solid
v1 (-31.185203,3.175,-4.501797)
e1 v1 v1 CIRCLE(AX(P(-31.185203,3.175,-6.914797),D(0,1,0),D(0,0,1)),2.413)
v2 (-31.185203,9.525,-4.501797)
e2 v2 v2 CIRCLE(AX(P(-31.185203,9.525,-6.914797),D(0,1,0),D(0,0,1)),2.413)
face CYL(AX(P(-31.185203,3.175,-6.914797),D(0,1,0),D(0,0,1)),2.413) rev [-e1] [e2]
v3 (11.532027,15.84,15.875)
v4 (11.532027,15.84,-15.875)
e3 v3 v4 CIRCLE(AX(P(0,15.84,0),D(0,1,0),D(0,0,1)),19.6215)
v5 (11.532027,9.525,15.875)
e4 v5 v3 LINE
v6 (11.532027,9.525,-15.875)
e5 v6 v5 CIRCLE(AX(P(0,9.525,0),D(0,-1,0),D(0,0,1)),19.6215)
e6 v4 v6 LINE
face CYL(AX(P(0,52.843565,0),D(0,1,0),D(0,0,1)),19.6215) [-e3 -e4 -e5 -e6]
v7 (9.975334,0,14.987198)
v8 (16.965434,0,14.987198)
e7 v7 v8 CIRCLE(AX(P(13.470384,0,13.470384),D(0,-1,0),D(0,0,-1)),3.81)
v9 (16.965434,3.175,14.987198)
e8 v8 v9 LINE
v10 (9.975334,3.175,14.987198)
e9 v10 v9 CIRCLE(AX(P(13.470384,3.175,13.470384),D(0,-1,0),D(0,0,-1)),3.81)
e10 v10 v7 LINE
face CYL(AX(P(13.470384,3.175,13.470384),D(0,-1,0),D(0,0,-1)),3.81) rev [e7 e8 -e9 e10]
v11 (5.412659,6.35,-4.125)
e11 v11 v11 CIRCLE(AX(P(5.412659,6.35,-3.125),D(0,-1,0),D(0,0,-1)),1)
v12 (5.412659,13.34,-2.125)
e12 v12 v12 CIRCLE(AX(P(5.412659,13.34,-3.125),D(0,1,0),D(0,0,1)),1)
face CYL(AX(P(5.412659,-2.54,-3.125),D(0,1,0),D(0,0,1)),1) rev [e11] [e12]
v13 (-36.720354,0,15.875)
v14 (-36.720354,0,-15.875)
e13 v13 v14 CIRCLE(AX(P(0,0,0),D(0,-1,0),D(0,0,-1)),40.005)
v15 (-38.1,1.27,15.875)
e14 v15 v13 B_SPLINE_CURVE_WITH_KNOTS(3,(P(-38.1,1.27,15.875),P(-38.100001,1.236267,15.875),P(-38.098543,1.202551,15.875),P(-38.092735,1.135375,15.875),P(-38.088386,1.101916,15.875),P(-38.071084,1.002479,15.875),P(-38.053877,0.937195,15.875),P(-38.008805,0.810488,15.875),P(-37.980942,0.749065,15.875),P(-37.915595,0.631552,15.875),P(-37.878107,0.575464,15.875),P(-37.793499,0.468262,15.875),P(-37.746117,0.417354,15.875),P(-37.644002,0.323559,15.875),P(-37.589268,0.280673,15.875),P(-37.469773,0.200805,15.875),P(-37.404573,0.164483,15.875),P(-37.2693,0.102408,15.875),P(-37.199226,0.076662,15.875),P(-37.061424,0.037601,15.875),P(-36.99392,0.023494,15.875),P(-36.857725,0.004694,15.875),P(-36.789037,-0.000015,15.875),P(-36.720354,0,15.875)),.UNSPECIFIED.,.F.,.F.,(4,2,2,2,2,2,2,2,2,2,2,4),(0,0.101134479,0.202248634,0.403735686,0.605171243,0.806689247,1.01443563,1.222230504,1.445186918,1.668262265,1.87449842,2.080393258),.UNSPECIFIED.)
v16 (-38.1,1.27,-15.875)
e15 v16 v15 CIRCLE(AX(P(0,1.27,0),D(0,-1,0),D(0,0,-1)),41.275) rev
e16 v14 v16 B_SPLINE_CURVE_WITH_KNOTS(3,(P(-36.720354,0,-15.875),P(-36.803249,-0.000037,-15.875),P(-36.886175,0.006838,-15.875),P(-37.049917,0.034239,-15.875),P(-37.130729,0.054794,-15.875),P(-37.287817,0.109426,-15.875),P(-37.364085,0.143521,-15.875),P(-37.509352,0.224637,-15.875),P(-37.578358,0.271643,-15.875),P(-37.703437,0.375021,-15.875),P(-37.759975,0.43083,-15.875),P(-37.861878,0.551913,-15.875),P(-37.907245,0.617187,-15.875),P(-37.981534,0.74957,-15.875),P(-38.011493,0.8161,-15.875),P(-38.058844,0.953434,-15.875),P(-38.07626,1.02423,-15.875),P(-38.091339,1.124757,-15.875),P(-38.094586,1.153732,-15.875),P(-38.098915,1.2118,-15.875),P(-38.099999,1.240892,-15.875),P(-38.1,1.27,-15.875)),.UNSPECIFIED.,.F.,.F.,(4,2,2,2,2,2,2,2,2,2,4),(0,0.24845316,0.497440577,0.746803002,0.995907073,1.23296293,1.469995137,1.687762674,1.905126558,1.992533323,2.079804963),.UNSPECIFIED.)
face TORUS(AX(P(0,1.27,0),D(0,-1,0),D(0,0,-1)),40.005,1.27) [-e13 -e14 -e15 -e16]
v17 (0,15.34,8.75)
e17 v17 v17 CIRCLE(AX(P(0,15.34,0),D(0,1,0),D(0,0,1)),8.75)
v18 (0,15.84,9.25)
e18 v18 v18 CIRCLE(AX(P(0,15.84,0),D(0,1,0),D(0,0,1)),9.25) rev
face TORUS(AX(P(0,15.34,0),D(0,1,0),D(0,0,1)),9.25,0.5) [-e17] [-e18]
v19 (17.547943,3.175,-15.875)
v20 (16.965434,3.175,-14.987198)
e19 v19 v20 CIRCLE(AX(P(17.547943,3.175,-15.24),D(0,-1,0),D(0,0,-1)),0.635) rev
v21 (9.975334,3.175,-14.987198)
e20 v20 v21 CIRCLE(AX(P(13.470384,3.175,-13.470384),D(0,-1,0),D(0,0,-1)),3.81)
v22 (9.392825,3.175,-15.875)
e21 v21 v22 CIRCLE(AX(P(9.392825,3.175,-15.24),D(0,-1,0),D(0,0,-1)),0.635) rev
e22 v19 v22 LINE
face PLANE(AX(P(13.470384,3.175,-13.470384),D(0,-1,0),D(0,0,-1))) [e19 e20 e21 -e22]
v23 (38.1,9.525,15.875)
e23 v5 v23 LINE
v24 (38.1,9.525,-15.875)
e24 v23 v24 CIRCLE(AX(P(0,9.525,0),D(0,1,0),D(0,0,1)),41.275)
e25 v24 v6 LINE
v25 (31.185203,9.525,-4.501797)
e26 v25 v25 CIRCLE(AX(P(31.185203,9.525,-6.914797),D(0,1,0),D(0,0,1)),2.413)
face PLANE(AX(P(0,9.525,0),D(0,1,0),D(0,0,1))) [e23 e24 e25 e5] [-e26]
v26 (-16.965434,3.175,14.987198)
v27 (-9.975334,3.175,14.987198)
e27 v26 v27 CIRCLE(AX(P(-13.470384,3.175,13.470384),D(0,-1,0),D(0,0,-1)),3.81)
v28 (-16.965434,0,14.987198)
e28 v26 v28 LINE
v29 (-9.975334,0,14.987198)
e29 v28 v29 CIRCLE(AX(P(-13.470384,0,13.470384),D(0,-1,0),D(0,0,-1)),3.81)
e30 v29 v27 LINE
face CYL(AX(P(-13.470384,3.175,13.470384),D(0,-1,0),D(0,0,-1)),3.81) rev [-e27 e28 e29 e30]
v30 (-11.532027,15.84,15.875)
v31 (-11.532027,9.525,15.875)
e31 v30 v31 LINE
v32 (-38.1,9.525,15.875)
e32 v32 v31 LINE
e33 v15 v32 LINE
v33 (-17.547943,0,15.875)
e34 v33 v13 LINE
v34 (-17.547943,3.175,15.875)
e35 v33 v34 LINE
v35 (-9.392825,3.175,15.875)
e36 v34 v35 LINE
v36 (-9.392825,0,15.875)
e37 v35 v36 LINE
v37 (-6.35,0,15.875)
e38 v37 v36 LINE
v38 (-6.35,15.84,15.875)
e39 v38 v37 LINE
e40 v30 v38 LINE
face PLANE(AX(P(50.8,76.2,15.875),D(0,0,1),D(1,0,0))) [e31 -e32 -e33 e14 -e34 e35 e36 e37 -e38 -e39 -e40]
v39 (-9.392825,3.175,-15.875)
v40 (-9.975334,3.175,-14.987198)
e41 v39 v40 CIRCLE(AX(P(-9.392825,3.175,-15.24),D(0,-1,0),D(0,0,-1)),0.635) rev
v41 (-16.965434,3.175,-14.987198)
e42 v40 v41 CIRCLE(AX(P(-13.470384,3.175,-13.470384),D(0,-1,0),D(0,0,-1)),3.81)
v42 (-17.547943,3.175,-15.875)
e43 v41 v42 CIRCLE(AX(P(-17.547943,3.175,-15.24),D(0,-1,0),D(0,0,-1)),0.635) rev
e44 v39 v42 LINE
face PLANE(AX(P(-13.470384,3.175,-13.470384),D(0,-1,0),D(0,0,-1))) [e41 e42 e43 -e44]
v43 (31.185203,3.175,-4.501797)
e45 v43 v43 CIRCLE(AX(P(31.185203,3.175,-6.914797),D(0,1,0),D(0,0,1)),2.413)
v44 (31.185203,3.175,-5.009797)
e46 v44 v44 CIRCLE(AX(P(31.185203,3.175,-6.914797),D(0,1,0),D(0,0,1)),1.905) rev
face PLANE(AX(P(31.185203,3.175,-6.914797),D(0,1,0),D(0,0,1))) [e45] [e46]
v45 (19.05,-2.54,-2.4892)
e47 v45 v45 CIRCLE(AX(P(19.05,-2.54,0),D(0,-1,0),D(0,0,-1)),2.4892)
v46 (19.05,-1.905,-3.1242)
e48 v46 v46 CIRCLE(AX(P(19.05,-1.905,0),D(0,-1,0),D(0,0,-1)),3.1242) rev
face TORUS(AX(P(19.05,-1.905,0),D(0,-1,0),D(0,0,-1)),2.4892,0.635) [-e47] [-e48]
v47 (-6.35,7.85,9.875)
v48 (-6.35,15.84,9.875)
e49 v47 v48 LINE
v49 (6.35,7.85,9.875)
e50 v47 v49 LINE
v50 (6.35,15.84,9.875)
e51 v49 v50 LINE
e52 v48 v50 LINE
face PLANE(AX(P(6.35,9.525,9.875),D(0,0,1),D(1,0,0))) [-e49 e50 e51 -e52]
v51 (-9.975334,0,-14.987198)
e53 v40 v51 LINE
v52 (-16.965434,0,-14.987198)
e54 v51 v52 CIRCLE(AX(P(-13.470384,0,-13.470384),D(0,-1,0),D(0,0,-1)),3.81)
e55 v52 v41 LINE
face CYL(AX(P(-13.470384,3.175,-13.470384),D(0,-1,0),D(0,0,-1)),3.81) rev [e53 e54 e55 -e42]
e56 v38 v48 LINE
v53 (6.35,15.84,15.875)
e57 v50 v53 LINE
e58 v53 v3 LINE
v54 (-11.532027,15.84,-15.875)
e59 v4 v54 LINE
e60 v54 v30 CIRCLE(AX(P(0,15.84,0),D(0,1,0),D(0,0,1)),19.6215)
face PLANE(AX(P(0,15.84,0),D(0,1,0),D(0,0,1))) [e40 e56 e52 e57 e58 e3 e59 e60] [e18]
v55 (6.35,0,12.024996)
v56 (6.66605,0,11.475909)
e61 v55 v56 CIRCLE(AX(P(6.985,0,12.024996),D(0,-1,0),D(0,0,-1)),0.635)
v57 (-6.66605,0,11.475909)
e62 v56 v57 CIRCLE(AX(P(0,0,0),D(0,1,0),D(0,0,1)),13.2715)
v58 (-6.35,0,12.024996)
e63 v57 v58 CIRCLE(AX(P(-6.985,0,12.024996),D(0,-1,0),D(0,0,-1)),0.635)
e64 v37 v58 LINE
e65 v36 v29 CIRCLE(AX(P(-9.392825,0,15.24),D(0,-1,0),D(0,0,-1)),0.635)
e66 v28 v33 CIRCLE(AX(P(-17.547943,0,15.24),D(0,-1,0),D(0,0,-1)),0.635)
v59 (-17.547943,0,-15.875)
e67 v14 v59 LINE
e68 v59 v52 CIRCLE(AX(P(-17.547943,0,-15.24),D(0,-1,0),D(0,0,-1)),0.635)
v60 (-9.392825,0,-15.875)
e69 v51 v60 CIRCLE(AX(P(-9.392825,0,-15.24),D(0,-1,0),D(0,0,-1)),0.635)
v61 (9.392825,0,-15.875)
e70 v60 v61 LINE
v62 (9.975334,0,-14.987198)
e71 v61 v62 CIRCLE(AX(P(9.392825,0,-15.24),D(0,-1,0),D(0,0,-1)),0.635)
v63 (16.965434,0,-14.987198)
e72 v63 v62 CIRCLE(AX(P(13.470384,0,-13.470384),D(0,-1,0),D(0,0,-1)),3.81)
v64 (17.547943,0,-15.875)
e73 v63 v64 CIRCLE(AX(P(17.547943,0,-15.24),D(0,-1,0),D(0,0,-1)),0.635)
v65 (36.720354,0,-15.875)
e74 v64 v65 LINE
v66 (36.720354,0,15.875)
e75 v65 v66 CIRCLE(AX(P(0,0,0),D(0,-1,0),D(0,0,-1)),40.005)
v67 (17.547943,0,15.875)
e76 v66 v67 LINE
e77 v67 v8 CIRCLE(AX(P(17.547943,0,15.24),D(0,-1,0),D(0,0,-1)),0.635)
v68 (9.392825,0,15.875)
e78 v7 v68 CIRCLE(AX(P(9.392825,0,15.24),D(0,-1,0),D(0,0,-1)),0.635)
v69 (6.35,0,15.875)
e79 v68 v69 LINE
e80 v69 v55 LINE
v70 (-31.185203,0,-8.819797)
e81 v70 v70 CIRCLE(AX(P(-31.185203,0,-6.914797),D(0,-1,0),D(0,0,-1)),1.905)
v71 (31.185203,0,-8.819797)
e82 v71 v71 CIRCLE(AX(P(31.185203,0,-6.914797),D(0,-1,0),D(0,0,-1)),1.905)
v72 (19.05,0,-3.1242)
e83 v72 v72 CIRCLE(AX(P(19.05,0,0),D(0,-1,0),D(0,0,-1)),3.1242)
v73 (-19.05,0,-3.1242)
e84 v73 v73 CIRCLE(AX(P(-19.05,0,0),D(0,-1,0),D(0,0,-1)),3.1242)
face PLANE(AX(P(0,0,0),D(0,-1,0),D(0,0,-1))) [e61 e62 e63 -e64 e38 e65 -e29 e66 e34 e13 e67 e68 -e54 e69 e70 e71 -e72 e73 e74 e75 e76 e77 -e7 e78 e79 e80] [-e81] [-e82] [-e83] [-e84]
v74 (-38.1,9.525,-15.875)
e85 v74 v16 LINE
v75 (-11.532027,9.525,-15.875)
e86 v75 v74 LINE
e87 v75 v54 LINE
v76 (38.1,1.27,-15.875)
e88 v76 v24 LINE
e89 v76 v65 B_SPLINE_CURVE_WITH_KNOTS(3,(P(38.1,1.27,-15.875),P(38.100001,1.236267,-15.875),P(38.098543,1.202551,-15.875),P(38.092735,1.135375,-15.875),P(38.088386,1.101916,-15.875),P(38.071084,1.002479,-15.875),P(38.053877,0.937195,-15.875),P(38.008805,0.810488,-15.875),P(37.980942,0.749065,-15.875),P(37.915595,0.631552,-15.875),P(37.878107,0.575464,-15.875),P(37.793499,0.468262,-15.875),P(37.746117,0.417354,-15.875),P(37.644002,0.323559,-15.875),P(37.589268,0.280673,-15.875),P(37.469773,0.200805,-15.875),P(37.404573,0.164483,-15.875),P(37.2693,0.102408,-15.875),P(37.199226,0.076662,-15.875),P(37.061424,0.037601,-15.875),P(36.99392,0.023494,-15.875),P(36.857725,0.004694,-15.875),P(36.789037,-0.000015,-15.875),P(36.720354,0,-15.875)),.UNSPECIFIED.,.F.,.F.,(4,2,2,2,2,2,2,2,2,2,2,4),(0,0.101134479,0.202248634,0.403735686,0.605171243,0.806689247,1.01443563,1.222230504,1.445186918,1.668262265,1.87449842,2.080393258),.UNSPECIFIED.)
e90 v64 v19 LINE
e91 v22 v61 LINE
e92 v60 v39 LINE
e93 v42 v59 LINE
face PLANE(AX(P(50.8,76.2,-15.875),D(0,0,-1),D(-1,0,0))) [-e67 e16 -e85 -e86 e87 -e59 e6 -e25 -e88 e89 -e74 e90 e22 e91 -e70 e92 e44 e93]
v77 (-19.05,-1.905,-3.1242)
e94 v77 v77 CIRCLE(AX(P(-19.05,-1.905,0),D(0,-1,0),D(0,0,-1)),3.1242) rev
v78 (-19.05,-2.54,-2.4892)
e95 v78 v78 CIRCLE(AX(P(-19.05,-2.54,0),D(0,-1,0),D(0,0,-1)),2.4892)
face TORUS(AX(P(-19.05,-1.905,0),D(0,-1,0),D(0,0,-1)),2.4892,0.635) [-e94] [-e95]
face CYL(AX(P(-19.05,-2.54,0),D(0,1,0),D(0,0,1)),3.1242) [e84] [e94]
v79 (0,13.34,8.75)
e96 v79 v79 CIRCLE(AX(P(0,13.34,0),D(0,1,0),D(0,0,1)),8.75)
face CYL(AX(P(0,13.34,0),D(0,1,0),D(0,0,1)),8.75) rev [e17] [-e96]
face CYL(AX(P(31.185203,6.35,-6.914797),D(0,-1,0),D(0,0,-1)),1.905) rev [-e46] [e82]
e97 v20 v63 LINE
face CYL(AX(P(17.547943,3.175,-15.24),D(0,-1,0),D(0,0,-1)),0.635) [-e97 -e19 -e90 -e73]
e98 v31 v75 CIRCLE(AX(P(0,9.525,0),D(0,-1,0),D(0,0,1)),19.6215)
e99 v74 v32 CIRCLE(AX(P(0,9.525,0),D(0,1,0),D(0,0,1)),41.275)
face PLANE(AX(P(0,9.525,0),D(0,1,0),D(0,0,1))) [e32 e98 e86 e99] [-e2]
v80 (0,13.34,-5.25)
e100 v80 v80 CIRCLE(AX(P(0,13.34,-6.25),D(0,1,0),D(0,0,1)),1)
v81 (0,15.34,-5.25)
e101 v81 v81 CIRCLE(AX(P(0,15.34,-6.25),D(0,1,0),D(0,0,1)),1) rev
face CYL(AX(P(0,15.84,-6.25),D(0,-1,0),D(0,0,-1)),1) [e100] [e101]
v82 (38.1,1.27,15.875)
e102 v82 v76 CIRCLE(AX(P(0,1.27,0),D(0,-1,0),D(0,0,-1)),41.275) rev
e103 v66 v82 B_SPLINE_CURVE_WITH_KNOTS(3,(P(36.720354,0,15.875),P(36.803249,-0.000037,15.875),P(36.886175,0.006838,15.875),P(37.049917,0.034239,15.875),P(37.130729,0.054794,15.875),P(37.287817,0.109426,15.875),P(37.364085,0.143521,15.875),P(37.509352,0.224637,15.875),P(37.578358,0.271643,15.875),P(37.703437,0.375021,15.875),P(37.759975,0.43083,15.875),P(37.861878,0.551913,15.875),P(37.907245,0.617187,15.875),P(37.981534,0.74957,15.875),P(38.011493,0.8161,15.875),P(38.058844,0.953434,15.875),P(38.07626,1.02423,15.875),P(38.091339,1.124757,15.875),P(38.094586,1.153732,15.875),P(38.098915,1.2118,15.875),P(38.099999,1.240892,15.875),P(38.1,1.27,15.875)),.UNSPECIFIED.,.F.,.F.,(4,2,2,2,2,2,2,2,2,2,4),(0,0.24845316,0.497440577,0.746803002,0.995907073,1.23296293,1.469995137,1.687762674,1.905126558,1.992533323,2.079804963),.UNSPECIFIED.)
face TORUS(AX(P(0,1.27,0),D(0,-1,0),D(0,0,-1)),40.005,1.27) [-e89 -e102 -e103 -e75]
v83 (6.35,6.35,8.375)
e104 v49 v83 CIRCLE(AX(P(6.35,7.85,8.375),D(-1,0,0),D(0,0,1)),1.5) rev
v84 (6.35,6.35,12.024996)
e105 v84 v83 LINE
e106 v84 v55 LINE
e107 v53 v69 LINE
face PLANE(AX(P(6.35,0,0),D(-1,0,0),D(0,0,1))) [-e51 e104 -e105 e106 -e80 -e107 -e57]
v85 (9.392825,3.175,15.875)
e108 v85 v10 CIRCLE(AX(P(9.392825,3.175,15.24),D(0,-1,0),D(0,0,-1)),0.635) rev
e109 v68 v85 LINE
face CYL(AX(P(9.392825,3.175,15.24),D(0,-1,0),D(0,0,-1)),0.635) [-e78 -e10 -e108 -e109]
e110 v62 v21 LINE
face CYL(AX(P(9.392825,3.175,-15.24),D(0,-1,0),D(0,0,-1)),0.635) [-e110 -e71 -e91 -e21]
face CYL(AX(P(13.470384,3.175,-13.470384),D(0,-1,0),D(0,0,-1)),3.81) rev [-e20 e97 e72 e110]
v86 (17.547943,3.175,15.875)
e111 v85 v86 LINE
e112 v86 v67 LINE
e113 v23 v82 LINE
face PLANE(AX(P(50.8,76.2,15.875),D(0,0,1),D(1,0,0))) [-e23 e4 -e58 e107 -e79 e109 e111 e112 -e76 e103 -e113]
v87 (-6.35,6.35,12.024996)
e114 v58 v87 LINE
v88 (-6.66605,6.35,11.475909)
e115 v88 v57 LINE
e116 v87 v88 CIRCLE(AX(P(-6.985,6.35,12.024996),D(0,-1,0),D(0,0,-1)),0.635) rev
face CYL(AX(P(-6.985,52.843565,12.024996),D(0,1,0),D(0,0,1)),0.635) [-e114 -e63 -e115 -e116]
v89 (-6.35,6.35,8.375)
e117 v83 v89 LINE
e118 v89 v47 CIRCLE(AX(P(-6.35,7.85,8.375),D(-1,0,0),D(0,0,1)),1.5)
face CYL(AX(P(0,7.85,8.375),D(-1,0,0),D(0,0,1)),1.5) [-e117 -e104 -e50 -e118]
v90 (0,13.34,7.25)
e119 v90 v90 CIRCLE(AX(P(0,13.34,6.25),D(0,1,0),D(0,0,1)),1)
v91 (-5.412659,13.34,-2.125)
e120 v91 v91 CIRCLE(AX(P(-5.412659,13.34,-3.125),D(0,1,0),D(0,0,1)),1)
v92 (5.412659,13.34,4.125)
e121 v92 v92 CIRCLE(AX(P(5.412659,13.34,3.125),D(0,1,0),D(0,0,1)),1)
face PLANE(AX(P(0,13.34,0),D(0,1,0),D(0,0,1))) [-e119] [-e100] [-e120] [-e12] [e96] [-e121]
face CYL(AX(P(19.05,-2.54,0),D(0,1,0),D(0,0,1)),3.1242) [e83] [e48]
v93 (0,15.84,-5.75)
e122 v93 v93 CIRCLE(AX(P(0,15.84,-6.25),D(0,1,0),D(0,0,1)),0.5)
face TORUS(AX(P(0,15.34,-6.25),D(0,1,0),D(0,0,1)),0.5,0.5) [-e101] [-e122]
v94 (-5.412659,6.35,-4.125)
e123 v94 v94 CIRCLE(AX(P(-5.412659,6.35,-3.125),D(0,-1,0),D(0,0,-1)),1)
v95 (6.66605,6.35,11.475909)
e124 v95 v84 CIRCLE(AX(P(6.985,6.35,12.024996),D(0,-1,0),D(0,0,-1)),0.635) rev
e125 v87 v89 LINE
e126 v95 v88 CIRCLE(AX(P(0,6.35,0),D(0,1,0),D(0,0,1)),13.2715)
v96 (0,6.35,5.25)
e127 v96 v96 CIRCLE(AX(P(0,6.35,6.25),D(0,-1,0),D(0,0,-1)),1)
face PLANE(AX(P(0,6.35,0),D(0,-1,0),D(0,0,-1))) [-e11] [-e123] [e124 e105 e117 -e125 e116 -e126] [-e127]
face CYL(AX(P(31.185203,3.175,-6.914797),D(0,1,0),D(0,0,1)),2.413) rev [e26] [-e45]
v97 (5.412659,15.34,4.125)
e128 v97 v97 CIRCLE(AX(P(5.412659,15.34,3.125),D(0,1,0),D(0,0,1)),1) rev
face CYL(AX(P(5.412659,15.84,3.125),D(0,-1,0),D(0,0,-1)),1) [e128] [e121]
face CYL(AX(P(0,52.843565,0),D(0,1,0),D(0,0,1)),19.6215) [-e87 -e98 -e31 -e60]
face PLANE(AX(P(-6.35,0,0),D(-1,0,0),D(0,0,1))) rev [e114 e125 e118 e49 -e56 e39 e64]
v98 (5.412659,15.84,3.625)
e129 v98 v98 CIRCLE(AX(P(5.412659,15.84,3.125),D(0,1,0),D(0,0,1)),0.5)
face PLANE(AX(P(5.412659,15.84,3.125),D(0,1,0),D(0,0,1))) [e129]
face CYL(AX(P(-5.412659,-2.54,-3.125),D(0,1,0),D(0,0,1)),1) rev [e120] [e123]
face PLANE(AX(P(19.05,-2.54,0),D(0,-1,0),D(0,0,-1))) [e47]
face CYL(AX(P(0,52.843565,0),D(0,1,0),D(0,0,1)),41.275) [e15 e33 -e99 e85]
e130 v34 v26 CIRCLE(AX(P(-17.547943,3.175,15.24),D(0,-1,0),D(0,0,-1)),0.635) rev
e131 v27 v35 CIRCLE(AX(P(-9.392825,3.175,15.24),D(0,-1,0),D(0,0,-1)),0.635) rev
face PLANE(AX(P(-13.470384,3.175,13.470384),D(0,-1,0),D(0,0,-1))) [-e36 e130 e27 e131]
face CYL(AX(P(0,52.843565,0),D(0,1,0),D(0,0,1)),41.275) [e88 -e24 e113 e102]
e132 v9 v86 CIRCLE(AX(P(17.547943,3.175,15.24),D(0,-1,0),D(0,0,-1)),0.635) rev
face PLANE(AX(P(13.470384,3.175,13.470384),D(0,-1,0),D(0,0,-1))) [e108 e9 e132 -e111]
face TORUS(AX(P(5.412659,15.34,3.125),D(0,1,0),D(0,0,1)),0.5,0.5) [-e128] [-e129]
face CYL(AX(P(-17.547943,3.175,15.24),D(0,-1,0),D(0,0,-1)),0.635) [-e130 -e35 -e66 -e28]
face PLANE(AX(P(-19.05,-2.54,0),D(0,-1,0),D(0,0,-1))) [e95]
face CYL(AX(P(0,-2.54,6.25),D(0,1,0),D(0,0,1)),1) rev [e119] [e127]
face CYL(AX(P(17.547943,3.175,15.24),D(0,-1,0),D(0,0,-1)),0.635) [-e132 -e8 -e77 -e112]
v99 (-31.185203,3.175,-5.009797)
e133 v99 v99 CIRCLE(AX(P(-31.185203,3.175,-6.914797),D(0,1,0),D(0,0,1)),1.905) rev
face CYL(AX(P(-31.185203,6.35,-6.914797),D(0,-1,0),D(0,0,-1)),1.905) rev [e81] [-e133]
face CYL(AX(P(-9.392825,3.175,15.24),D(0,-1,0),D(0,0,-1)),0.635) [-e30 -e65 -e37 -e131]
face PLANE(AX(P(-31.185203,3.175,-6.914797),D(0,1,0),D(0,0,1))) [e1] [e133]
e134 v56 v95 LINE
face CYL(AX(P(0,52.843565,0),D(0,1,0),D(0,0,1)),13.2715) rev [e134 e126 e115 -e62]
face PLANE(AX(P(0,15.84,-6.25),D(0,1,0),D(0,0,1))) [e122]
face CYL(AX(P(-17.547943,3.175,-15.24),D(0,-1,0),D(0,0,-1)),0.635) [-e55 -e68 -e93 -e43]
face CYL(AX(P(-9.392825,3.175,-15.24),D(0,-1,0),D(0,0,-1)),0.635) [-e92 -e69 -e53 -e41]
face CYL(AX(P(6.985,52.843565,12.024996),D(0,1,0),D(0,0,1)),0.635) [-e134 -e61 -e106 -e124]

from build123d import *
from build123d.topology import SkipClean

# Parameters (mm, degrees)
SKETCH30_OUTSIDE_W       = 118.128
SKETCH30_OUTSIDE_H       = 118.128
SKETCH30_OUTSIDE_W_2     = 82.55
SKETCH30_OUTSIDE_H_2     = 50.8
CUT_EXTRUDE21_DEPTH      = 87.252543441
SHELL1_START             = 12.7
SHELL1_DEPTH             = 50.8
SHELL1_START_2           = 6.35
SHELL1_2_OUTLINE_R       = 3.7465
SHELL1_2_DEPTH           = 6.35
SHELL1_START_3           = -50.8
SHELL1_3_OUTLINE_R       = 3.7465
SHELL1_3_DEPTH           = 57.15
BOSS_EXTRUDE1_REACH      = 132.02
CUT_EXTRUDE12_DEPTH      = 80.881384721
CUT_EXTRUDE12_DEPTH_BACK = 80.881384721
SKETCH19_R               = 3.175
CUT_EXTRUDE13_DEPTH      = 4.7625
CUT_EXTRUDE13_DEPTH_BACK = 4.7625
SKETCH21_R               = 28.2575
SKETCH22_R               = 17.78
CUT_EXTRUDE15_DEPTH      = 5.08
CUT_EXTRUDE16_DEPTH      = 4.7625
CUT_EXTRUDE16_DEPTH_BACK = 4.7625
SKETCH23_R               = 13.97
CUT_EXTRUDE17_DEPTH      = 86.016516856
CUT_EXTRUDE17_DEPTH_BACK = 86.016516856
SKETCH24_R               = 3.7465
SKETCH25_R               = 3.7465
BOSS_EXTRUDE2_DEPTH      = 66.04
CUT_EXTRUDE22_DEPTH      = 135.028630399
CUT_EXTRUDE23_DEPTH      = 91.306288007
CUT_EXTRUDE23_DEPTH_BACK = 91.306288007
SKETCH32_W               = 95.286677043
SKETCH32_H               = 50.8
SKETCH37_R               = 0.889
CUT_EXTRUDE27_DEPTH      = 12.7
SKETCH39_R               = 3.1242
BOSS_EXTRUDE3_DEPTH      = 2.54
FILLET1_R                = 0.635
SKETCH40_R               = 1.905
CUT_EXTRUDE28_DEPTH      = 6.35
SKETCH41_R               = 11.303
CUT_EXTRUDE29_DEPTH      = 6.35
CUT_EXTRUDE31_DEPTH      = 57.15
SKETCH44_R               = 19.6215
CUT_EXTRUDE32_DEPTH      = 50.8
SKETCH45_R               = 13.589
SKETCH45_R_2             = 5.969
CUT_EXTRUDE33_DEPTH      = 2.2225
SKETCH48_R               = 13.2715
CUT_EXTRUDE35_DEPTH      = 86.016516938
SKETCH49_OUTSIDE_W       = 109.036
SKETCH49_OUTSIDE_H       = 70.936
SKETCH49_OUTSIDE_W_2     = 101.6
SKETCH49_OUTSIDE_H_2     = 31.75
CUT_EXTRUDE36_DEPTH      = 91.306288007
SKETCH50_R               = 3.81
CUT_EXTRUDE37_DEPTH      = 3.175
FILLET2_R                = 0.635
FILLET3_R                = 1.27
CUT_EXTRUDE38_DEPTH      = 6.35
CUT_EXTRUDE38_DEPTH_BACK = 6.35
SKETCH51_W               = 6
SKETCH51_H               = 9.525
FILLET4_R                = 0.635
CUT_EXTRUDE39_REACH      = 82.007
SKETCH52_W               = 12.7
SKETCH52_H               = 6
BOSS_EXTRUDE6_START      = -3.81
SKETCH59_R               = 3.7465
BOSS_EXTRUDE6_DEPTH      = 3.81
BOSS_EXTRUDE4_REACH      = 47.107
SKETCH54_W               = 13.335
SKETCH54_H               = 19.892835282
SKETCH62_R               = 1.905
BOSS_EXTRUDE7_DEPTH      = 3.175
SKETCH63_R               = 2.413
CUT_EXTRUDE45_DEPTH      = 6.35
BOSS_EXTRUDE9_DEPTH      = 3.14
FILLET7_R                = 1.5
SKETCH70_R               = 8.75
CUT_EXTRUDE46_DEPTH      = 2.5
SKETCH71_R               = 1
BOSS_EXTRUDE10_DEPTH     = 2.5
SKETCH72_R               = 1
CUT_EXTRUDE47_DEPTH      = 47.987398964
FILLET8_R                = 0.5


# Read off the part's stored shape, not the designer's step: Shell1
with BuildPart() as part:
    # Sketch1 → Revolve1 (revolve)
    with BuildSketch(Plane.XY, mode=Mode.PRIVATE) as revolve1_sk:
        Polygon((0, -57.15), (0, 63.5), (41.275, 63.5), (41.275, 0), (13.2715, 0), (13.2715, 6.35), (10.0965, 6.35), (10.0965, -57.15), align=None)
    revolve(revolve1_sk.sketch.rotate(Axis((0, 52.843565077, 0), (0, -1, 0)), 90), axis=Axis((0, 52.843565077, 0), (0, -1, 0)))

    # Sketch30 outside → Cut-Extrude21 (cut, through all)
    with BuildSketch(Plane.XZ):
        Rectangle(SKETCH30_OUTSIDE_W, SKETCH30_OUTSIDE_H)
        Rectangle(SKETCH30_OUTSIDE_W_2, SKETCH30_OUTSIDE_H_2, mode=Mode.SUBTRACT)
    extrude(amount=-CUT_EXTRUDE21_DEPTH, mode=Mode.SUBTRACT)

    # Shell1 outline → Shell1 (cut)
    with BuildSketch(Plane(origin=(0, 0, 0), x_dir=(1, 0, 0), z_dir=(0, 1, 0)).offset(SHELL1_START)):
        with BuildLine():
            ThreePointArc((-29.272053652, 19.05), (-34.925, 0), (-29.272053652, -19.05))
            Line((-29.272053652, -19.05), (29.272053652, -19.05))
            ThreePointArc((29.272053652, -19.05), (34.925, 0), (29.272053652, 19.05))
            Line((29.272053652, 19.05), (-29.272053652, 19.05))
        make_face()
    extrude(amount=SHELL1_DEPTH, mode=Mode.SUBTRACT)

    # Shell1 2 outline → Shell1 2 (cut)
    with BuildSketch(Plane(origin=(0, 0, 0), x_dir=(1, 0, 0), z_dir=(0, 1, 0)).offset(SHELL1_START_2)):
        with BuildLine():
            ThreePointArc((-4.701144781, -19.05), (-19.6215, 0), (-4.701144781, 19.05))
            Line((-4.701144781, 19.05), (-29.272053652, 19.05))
            ThreePointArc((-29.272053652, 19.05), (-34.925, 0), (-29.272053652, -19.05))
            Line((-29.272053652, -19.05), (-4.701144781, -19.05))
        make_face()
        with BuildLine():
            Line((29.272053652, 19.05), (4.701144781, 19.05))
            ThreePointArc((4.701144781, 19.05), (19.6215, 0), (4.701144781, -19.05))
            Line((4.701144781, -19.05), (29.272053652, -19.05))
            ThreePointArc((29.272053652, -19.05), (34.925, 0), (29.272053652, 19.05))
        make_face()
        Circle(SHELL1_2_OUTLINE_R)
    extrude(amount=SHELL1_2_DEPTH, mode=Mode.SUBTRACT)

    # Shell1 3 outline → Shell1 3 (cut)
    with BuildSketch(Plane(origin=(0, 0, 0), x_dir=(1, 0, 0), z_dir=(0, 1, 0)).offset(SHELL1_START_3)):
        Circle(SHELL1_3_OUTLINE_R)
    extrude(amount=SHELL1_3_DEPTH, mode=Mode.SUBTRACT)

    # Sketch18 → Boss-Extrude1 (add, up to next)
    with BuildSketch(Plane(origin=(0, 63.5, 0), x_dir=(1, 0, 0), z_dir=(0, 1, 0)), mode=Mode.PRIVATE) as boss_extrude1_sk1:
        with BuildLine():
            Line((-31.75, 14.549677831), (-31.75, -14.549677831))
            ThreePointArc((-31.75, -14.549677831), (-34.925, 0), (-31.75, 14.549677831))
        make_face()
    boss_extrude1_tool1 = extrude(boss_extrude1_sk1.sketch, amount=-BOSS_EXTRUDE1_REACH, mode=Mode.PRIVATE) - part.part
    # Sketch18 → Boss-Extrude1 (add, up to next)
    with BuildSketch(Plane(origin=(0, 63.5, 0), x_dir=(1, 0, 0), z_dir=(0, 1, 0)), mode=Mode.PRIVATE) as boss_extrude1_sk2:
        with BuildLine():
            Line((31.75, 14.549677831), (31.75, -14.549677831))
            ThreePointArc((31.75, -14.549677831), (34.925, 0), (31.75, 14.549677831))
        make_face()
    boss_extrude1_tool2 = extrude(boss_extrude1_sk2.sketch, amount=-BOSS_EXTRUDE1_REACH, mode=Mode.PRIVATE) - part.part
    add(boss_extrude1_tool1.solids().sort_by_distance((-33.025082, 63.5, 0))[0])
    add(boss_extrude1_tool2.solids().sort_by_distance((33.025082, 63.5, 0))[0])

    # Sketch19 → Cut-Extrude12 (cut, two sides: drawn at the far end of the back side and taken through both)
    with BuildSketch(Plane(origin=(0, 0, 0), x_dir=(0, 0, -1), z_dir=(1, 0, 0)).offset(-CUT_EXTRUDE12_DEPTH_BACK)):
        with Locations((-9.634664718, 31.75)):
            Circle(SKETCH19_R)
    extrude(amount=CUT_EXTRUDE12_DEPTH + CUT_EXTRUDE12_DEPTH_BACK, mode=Mode.SUBTRACT)

    # Sketch21 → Cut-Extrude13 (cut, two sides: drawn at the far end of the back side and taken through both)
    with BuildSketch(Plane(origin=(26.9875, 0, 0), x_dir=(0, 0, -1), z_dir=(1, 0, 0)).offset(-CUT_EXTRUDE13_DEPTH_BACK)):
        with Locations((-9.634664718, 31.75)):
            Circle(SKETCH21_R)
    extrude(amount=CUT_EXTRUDE13_DEPTH + CUT_EXTRUDE13_DEPTH_BACK, mode=Mode.SUBTRACT)

    # Sketch22 → Cut-Extrude15 (cut, symmetric)
    with BuildSketch(Plane(origin=(23.495, 0, 0), x_dir=(0, 0, -1), z_dir=(1, 0, 0))):
        with Locations((-9.634664718, 31.75)):
            Circle(SKETCH22_R)
    cut_extrude15 = extrude(amount=CUT_EXTRUDE15_DEPTH, both=True, mode=Mode.SUBTRACT)

    # Mirror1: Cut-Extrude15 across plane
    add(cut_extrude15.mirror(Plane(origin=(0, 0, 0), x_dir=(0, 0, 1), z_dir=(1, 0, 0))), mode=Mode.SUBTRACT)

    # Sketch23 → Cut-Extrude16 (cut, two sides: drawn at the far end of the back side and taken through both)
    with BuildSketch(Plane.ZY.offset(16.8275).offset(-CUT_EXTRUDE16_DEPTH_BACK)):
        with Locations((9.634664718, 31.75)):
            Circle(SKETCH23_R)
    extrude(amount=CUT_EXTRUDE16_DEPTH + CUT_EXTRUDE16_DEPTH_BACK, mode=Mode.SUBTRACT)

    # Sketch24 → Cut-Extrude17 (cut, two sides: drawn at the far end of the back side and taken through both)
    with SkipClean():  # the faces are left unmerged after this step: merging them gives an invalid solid
        with BuildSketch(Plane(origin=(0, 12.7, 0), x_dir=(1, 0, 0), z_dir=(0, 1, 0)).offset(-CUT_EXTRUDE17_DEPTH_BACK)):
            with Locations(Location((0, 0, 0), (0, 0, 270))):
                Circle(SKETCH24_R)
        extrude(amount=CUT_EXTRUDE17_DEPTH + CUT_EXTRUDE17_DEPTH_BACK, mode=Mode.SUBTRACT)

    # Sketch25 → Boss-Extrude2 (add)
    with BuildSketch(Plane.XZ.offset(57.15)):
        with Locations(Location((0, 0, 0), (0, 0, 270))):
            Circle(SKETCH25_R)
    extrude(amount=-BOSS_EXTRUDE2_DEPTH)

    # Sketch26 → Revolve2 (revolve)
    with BuildSketch(Plane.XY, mode=Mode.PRIVATE) as revolve2_sk:
        with BuildLine():
            Line((-6.4135, 76.2), (-12.7, 76.2))
            ThreePointArc((-12.7, 76.2), (-26.638973174, 71.456629283), (-41.275, 69.85))
            Line((-41.275, 69.85), (-41.275, 63.5))
            Line((-41.275, 63.5), (-6.4135, 63.5))
            Line((-6.4135, 63.5), (-6.4135, 76.2))
        make_face()
    revolve(revolve2_sk.sketch.rotate(Axis((0, 63.5, 0), (0, -1, 0)), 270), axis=Axis((0, 63.5, 0), (0, -1, 0)))

    # Sketch31 → Cut-Extrude22 (cut, through all)
    with BuildSketch(Plane.XZ.offset(-63.5)):
        with BuildLine():
            Line((32.534068682, -25.4), (-32.534068682, -25.4))
            ThreePointArc((-32.534068682, -25.4), (0, -41.275), (32.534068682, -25.4))
        make_face()
        with BuildLine():
            Line((-32.534068682, 25.4), (32.534068682, 25.4))
            ThreePointArc((32.534068682, 25.4), (0, 41.275), (-32.534068682, 25.4))
        make_face()
    extrude(amount=-CUT_EXTRUDE22_DEPTH, mode=Mode.SUBTRACT)

    # Sketch32 → Cut-Extrude23 (cut, two sides: drawn at the far end of the back side and taken through both)
    with BuildSketch(Plane(origin=(0, 0, 0), x_dir=(1, 0, 0), z_dir=(0, 1, 0)).offset(-CUT_EXTRUDE23_DEPTH_BACK)):
        with Locations((2.980488965, 44.45)):
            Rectangle(SKETCH32_W, SKETCH32_H)
    extrude(amount=CUT_EXTRUDE23_DEPTH + CUT_EXTRUDE23_DEPTH_BACK, mode=Mode.SUBTRACT)

    # Sketch37 → Cut-Extrude27 (cut)
    with BuildSketch(Plane(origin=(0, 76.2, 0), x_dir=(1, 0, 0), z_dir=(0, 1, 0))):
        with Locations(Location((-8.73125, 0, 0), (0, 0, 270))):
            Circle(SKETCH37_R)
        with Locations(Location((8.73125, 0, 0), (0, 0, 270))):
            Circle(SKETCH37_R)
    extrude(amount=-CUT_EXTRUDE27_DEPTH, mode=Mode.SUBTRACT)

    # Sketch39 → Boss-Extrude3 (add)
    with BuildSketch(Plane.XZ):
        with Locations(Location((-19.05, 0, 0), (0, 0, 270))):
            Circle(SKETCH39_R)
        with Locations(Location((19.05, 0, 0), (0, 0, 270))):
            Circle(SKETCH39_R)
    extrude(amount=BOSS_EXTRUDE3_DEPTH)

    # Fillet1
    fillet1_edges = [part.edges().sort_by_distance(p)[0] for p in [
        (-19.05, -2.54, 3.1242),
        (19.05, -2.54, 3.1242),
    ]]
    fillet(fillet1_edges, radius=FILLET1_R)

    # Sketch40 → Cut-Extrude28 (cut)
    with BuildSketch(Plane.XZ):
        with Locations(Location((31.185202787, -6.914797213, 0), (0, 0, 270))):
            Circle(SKETCH40_R)
        with Locations(Location((-31.185202787, -6.914797213, 0), (0, 0, 270))):
            Circle(SKETCH40_R)
    extrude(amount=-CUT_EXTRUDE28_DEPTH, mode=Mode.SUBTRACT)

    # Sketch41 → Cut-Extrude29 (cut)
    with BuildSketch(Plane(origin=(0, 76.2, 0), x_dir=(1, 0, 0), z_dir=(0, 1, 0))):
        with Locations(Location((0, 0, 0), (0, 0, 270))):
            Circle(SKETCH41_R)
    extrude(amount=-CUT_EXTRUDE29_DEPTH, mode=Mode.SUBTRACT)

    # Sketch43 → Cut-Extrude31 (cut)
    with BuildSketch(Plane(origin=(0, 6.35, 0), x_dir=(1, 0, 0), z_dir=(0, 1, 0))):
        with BuildLine():
            Line((-31.75, 19.05), (-31.75, -25.4))
            Line((-31.75, -25.4), (31.75, -25.4))
            Line((31.75, -25.4), (31.75, 19.05))
            Line((31.75, 19.05), (4.701144781, 19.05))
            ThreePointArc((4.701144781, 19.05), (0, -19.6215), (-4.701144781, 19.05))
            Line((-4.701144781, 19.05), (-31.75, 19.05))
        make_face()
    extrude(amount=CUT_EXTRUDE31_DEPTH, mode=Mode.SUBTRACT)

    # Sketch44 → Cut-Extrude32 (cut)
    with BuildSketch(Plane(origin=(0, 12.7, 0), x_dir=(1, 0, 0), z_dir=(0, 1, 0))):
        Circle(SKETCH44_R)
    extrude(amount=CUT_EXTRUDE32_DEPTH, mode=Mode.SUBTRACT)

    # Sketch45 → Cut-Extrude33 (cut)
    with BuildSketch(Plane(origin=(33.9725, 0, 0), x_dir=(0, 0, -1), z_dir=(1, 0, 0))):
        with Locations((-9.634664718, 31.75)):
            Circle(SKETCH45_R)
        with Locations((-9.634664718, 31.75)):
            Circle(SKETCH45_R_2, mode=Mode.SUBTRACT)
    extrude(amount=-CUT_EXTRUDE33_DEPTH, mode=Mode.SUBTRACT)

    # Sketch48 → Cut-Extrude35 (cut, through all)
    with BuildSketch(Plane.XZ.offset(-6.35)):
        with Locations(Location((0, 0, 0), (0, 0, 90))):
            Circle(SKETCH48_R)
    extrude(amount=CUT_EXTRUDE35_DEPTH, mode=Mode.SUBTRACT)

    # Sketch49 outside → Cut-Extrude36 (cut, through all)
    with BuildSketch(Plane.XZ):
        with Locations((0, 3.175)):
            Rectangle(SKETCH49_OUTSIDE_W, SKETCH49_OUTSIDE_H)
        Rectangle(SKETCH49_OUTSIDE_W_2, SKETCH49_OUTSIDE_H_2, mode=Mode.SUBTRACT)
    extrude(amount=-CUT_EXTRUDE36_DEPTH, mode=Mode.SUBTRACT)

    # Sketch50 → Cut-Extrude37 (cut)
    with BuildSketch(Plane.XZ):
        with Locations((-13.470384182, 13.470384182)):
            Circle(SKETCH50_R)
        with Locations((13.470384182, 13.470384182)):
            Circle(SKETCH50_R)
        with Locations((13.470384182, -13.470384182)):
            Circle(SKETCH50_R)
        with Locations((-13.470384182, -13.470384182)):
            Circle(SKETCH50_R)
    extrude(amount=-CUT_EXTRUDE37_DEPTH, mode=Mode.SUBTRACT)

    # Fillet2
    fillet2_edges = [part.edges().sort_by_distance(p)[0] for p in [
        (32.86125, 43.821418167, 15.875),
        (32.86125, 19.678581833, 15.875),
        (-10.515063088, 1.5875, 15.875),
        (-16.425705275, 1.5875, 15.875),
        (16.425705275, 1.5875, 15.875),
        (10.515063088, 1.5875, 15.875),
        (10.515063088, 1.5875, -15.875),
        (16.425705275, 1.5875, -15.875),
        (-16.425705275, 1.5875, -15.875),
        (-10.515063088, 1.5875, -15.875),
    ]]
    fillet(fillet2_edges, radius=FILLET2_R)

    # Fillet3
    fillet3_edges = [part.edges().sort_by_distance(p)[0] for p in [
        (41.275, 0, 0),
        (-41.275, 0, 0),
        (-41.275, 69.85, 0),
        (41.275, 69.85, 0),
    ]]
    fillet(fillet3_edges, radius=FILLET3_R)

    # Sketch51 → Cut-Extrude38 (cut, two sides: drawn at the far end of the back side and taken through both)
    with BuildSketch(Plane(origin=(0, 0, 0), x_dir=(0, 0, -1), z_dir=(1, 0, 0)).offset(-CUT_EXTRUDE38_DEPTH_BACK)):
        with Locations((-12.875, 4.7625)):
            Rectangle(SKETCH51_W, SKETCH51_H)
    extrude(amount=CUT_EXTRUDE38_DEPTH + CUT_EXTRUDE38_DEPTH_BACK, mode=Mode.SUBTRACT)

    # Fillet4
    fillet4_edges = [part.edges().sort_by_distance(p)[0] for p in [
        (-6.35, 3.175, 11.653763866),
        (6.35, 3.175, 11.653763866),
    ]]
    fillet(fillet4_edges, radius=FILLET4_R)

    # Sketch52 → Cut-Extrude39 (cut, up to next)
    with BuildSketch(Plane.XZ.offset(-9.525), mode=Mode.PRIVATE) as cut_extrude39_sk1:
        with Locations((0, 12.875)):
            Rectangle(SKETCH52_W, SKETCH52_H)
    cut_extrude39_tool1 = extrude(cut_extrude39_sk1.sketch, amount=-CUT_EXTRUDE39_REACH, mode=Mode.PRIVATE) & part.part
    add(cut_extrude39_tool1.solids().sort_by_distance((0, 9.525, 12.875))[0], mode=Mode.SUBTRACT)

    # Sketch59 → Boss-Extrude6 (add)
    with BuildSketch(Plane(origin=(0, 12.7, 0), x_dir=(1, 0, 0), z_dir=(0, 1, 0)).offset(BOSS_EXTRUDE6_START)):
        Circle(SKETCH59_R)
    extrude(amount=BOSS_EXTRUDE6_DEPTH)

    # Sketch53 → Cut-Revolve1 (revolve, cut)
    with BuildSketch(Plane.XY):
        Polygon((-19.6215, 6.35), (-19.6215, 12.7), (0, 12.7), (0, 88.9), (-45.0215, 88.9), (-45.0215, 6.35), align=None)
    revolve(axis=Axis((0, 100.373766563, 0), (0, -1, 0)), mode=Mode.SUBTRACT)

    # Sketch54 → Boss-Extrude4 (add, up to next)
    with BuildSketch(Plane(origin=(0, 6.35, 0), x_dir=(1, 0, 0), z_dir=(0, 1, 0)), mode=Mode.PRIVATE) as boss_extrude4_sk1:
        with Locations((27.6225, -5.928582359)):
            Rectangle(SKETCH54_W, SKETCH54_H)
    boss_extrude4_tool1 = extrude(boss_extrude4_sk1.sketch, amount=-BOSS_EXTRUDE4_REACH, mode=Mode.PRIVATE) - part.part
    add(boss_extrude4_tool1.solids().sort_by_distance((27.6225, 6.35, 5.928582))[0])

    # Sketch62 → Boss-Extrude7 (add)
    # profile 1 of 2: a face of its own
    with BuildSketch(Plane(origin=(0, 6.35, 0), x_dir=(1, 0, 0), z_dir=(0, 1, 0))):
        with BuildLine():
            Line((-38.1, -15.875), (-11.532026589, -15.875))
            ThreePointArc((-11.532026589, -15.875), (-19.6215, 0), (-11.532026589, 15.875))
            Line((-11.532026589, 15.875), (-38.1, 15.875))
            ThreePointArc((-38.1, 15.875), (-41.275, 0), (-38.1, -15.875))
        make_face()
        with Locations(Location((-31.185202787, 6.914797213, 0), (0, 0, 90))):
            Circle(SKETCH62_R, mode=Mode.SUBTRACT)
    # profile 2 of 2: a face of its own
    with BuildSketch(Plane(origin=(0, 6.35, 0), x_dir=(1, 0, 0), z_dir=(0, 1, 0))):
        with BuildLine():
            Line((11.532026589, -15.875), (38.1, -15.875))
            ThreePointArc((38.1, -15.875), (41.275, 0), (38.1, 15.875))
            Line((38.1, 15.875), (11.532026589, 15.875))
            ThreePointArc((11.532026589, 15.875), (19.6215, 0), (11.532026589, -15.875))
        make_face()
        with Locations(Location((31.185202787, 6.914797213, 0), (0, 0, 90))):
            Circle(SKETCH62_R, mode=Mode.SUBTRACT)
    extrude(amount=BOSS_EXTRUDE7_DEPTH)

    # Sketch63 → Cut-Extrude45 (cut)
    with BuildSketch(Plane(origin=(0, 9.525, 0), x_dir=(1, 0, 0), z_dir=(0, 1, 0))):
        with Locations(Location((31.185202787, 6.914797213, 0), (0, 0, 270))):
            Circle(SKETCH63_R)
        with Locations(Location((-31.185202787, 6.914797213, 0), (0, 0, 270))):
            Circle(SKETCH63_R)
    extrude(amount=-CUT_EXTRUDE45_DEPTH, mode=Mode.SUBTRACT)

    # Sketch69 → Boss-Extrude9 (add)
    with BuildSketch(Plane(origin=(0, 12.7, 0), x_dir=(1, 0, 0), z_dir=(0, 1, 0))):
        with BuildLine():
            Line((-6.35, -15.875), (-11.532026589, -15.875))
            ThreePointArc((-11.532026589, -15.875), (-19.6215, 0), (-11.532026589, 15.875))
            Line((-11.532026589, 15.875), (11.532026589, 15.875))
            ThreePointArc((11.532026589, 15.875), (19.6215, 0), (11.532026589, -15.875))
            Line((11.532026589, -15.875), (6.35, -15.875))
            Line((6.35, -15.875), (6.35, -9.875))
            Line((6.35, -9.875), (-6.35, -9.875))
            Line((-6.35, -9.875), (-6.35, -15.875))
        make_face()
    extrude(amount=BOSS_EXTRUDE9_DEPTH)

    # Fillet7
    fillet7_edges = [part.edges().sort_by_distance(p)[0] for p in [
        (0, 6.35, 9.875),
    ]]
    fillet(fillet7_edges, radius=FILLET7_R)

    # Sketch70 → Cut-Extrude46 (cut)
    with BuildSketch(Plane(origin=(0, 15.84, 0), x_dir=(1, 0, 0), z_dir=(0, 1, 0))):
        with Locations(Location((0, 0, 0), (0, 0, 270))):
            Circle(SKETCH70_R)
    extrude(amount=-CUT_EXTRUDE46_DEPTH, mode=Mode.SUBTRACT)

    # Sketch71 → Boss-Extrude10 (add)
    with BuildSketch(Plane(origin=(0, 13.34, 0), x_dir=(1, 0, 0), z_dir=(0, 1, 0))):
        with Locations(Location((0, 6.25, 0), (0, 0, 270))):
            Circle(SKETCH71_R)
        with Locations(Location((5.412658774, -3.125, 0), (0, 0, 270))):
            Circle(SKETCH71_R)
    extrude(amount=BOSS_EXTRUDE10_DEPTH)

    # Sketch72 → Cut-Extrude47 (cut, through all)
    with BuildSketch(Plane(origin=(0, 13.34, 0), x_dir=(1, 0, 0), z_dir=(0, 1, 0))):
        with Locations(Location((0, -6.25, 0), (0, 0, 270))):
            Circle(SKETCH72_R)
        with Locations(Location((-5.412658774, 3.125, 0), (0, 0, 270))):
            Circle(SKETCH72_R)
        with Locations(Location((5.412658774, 3.125, 0), (0, 0, 270))):
            Circle(SKETCH72_R)
    extrude(amount=-CUT_EXTRUDE47_DEPTH, mode=Mode.SUBTRACT)

    # Fillet8
    fillet8_edges = [part.edges().sort_by_distance(p)[0] for p in [
        (0, 15.84, -8.75),
        (0, 15.84, -7.25),
        (5.412658774, 15.84, 2.125),
    ]]
    fillet(fillet8_edges, radius=FILLET8_R)


solid = part.part
